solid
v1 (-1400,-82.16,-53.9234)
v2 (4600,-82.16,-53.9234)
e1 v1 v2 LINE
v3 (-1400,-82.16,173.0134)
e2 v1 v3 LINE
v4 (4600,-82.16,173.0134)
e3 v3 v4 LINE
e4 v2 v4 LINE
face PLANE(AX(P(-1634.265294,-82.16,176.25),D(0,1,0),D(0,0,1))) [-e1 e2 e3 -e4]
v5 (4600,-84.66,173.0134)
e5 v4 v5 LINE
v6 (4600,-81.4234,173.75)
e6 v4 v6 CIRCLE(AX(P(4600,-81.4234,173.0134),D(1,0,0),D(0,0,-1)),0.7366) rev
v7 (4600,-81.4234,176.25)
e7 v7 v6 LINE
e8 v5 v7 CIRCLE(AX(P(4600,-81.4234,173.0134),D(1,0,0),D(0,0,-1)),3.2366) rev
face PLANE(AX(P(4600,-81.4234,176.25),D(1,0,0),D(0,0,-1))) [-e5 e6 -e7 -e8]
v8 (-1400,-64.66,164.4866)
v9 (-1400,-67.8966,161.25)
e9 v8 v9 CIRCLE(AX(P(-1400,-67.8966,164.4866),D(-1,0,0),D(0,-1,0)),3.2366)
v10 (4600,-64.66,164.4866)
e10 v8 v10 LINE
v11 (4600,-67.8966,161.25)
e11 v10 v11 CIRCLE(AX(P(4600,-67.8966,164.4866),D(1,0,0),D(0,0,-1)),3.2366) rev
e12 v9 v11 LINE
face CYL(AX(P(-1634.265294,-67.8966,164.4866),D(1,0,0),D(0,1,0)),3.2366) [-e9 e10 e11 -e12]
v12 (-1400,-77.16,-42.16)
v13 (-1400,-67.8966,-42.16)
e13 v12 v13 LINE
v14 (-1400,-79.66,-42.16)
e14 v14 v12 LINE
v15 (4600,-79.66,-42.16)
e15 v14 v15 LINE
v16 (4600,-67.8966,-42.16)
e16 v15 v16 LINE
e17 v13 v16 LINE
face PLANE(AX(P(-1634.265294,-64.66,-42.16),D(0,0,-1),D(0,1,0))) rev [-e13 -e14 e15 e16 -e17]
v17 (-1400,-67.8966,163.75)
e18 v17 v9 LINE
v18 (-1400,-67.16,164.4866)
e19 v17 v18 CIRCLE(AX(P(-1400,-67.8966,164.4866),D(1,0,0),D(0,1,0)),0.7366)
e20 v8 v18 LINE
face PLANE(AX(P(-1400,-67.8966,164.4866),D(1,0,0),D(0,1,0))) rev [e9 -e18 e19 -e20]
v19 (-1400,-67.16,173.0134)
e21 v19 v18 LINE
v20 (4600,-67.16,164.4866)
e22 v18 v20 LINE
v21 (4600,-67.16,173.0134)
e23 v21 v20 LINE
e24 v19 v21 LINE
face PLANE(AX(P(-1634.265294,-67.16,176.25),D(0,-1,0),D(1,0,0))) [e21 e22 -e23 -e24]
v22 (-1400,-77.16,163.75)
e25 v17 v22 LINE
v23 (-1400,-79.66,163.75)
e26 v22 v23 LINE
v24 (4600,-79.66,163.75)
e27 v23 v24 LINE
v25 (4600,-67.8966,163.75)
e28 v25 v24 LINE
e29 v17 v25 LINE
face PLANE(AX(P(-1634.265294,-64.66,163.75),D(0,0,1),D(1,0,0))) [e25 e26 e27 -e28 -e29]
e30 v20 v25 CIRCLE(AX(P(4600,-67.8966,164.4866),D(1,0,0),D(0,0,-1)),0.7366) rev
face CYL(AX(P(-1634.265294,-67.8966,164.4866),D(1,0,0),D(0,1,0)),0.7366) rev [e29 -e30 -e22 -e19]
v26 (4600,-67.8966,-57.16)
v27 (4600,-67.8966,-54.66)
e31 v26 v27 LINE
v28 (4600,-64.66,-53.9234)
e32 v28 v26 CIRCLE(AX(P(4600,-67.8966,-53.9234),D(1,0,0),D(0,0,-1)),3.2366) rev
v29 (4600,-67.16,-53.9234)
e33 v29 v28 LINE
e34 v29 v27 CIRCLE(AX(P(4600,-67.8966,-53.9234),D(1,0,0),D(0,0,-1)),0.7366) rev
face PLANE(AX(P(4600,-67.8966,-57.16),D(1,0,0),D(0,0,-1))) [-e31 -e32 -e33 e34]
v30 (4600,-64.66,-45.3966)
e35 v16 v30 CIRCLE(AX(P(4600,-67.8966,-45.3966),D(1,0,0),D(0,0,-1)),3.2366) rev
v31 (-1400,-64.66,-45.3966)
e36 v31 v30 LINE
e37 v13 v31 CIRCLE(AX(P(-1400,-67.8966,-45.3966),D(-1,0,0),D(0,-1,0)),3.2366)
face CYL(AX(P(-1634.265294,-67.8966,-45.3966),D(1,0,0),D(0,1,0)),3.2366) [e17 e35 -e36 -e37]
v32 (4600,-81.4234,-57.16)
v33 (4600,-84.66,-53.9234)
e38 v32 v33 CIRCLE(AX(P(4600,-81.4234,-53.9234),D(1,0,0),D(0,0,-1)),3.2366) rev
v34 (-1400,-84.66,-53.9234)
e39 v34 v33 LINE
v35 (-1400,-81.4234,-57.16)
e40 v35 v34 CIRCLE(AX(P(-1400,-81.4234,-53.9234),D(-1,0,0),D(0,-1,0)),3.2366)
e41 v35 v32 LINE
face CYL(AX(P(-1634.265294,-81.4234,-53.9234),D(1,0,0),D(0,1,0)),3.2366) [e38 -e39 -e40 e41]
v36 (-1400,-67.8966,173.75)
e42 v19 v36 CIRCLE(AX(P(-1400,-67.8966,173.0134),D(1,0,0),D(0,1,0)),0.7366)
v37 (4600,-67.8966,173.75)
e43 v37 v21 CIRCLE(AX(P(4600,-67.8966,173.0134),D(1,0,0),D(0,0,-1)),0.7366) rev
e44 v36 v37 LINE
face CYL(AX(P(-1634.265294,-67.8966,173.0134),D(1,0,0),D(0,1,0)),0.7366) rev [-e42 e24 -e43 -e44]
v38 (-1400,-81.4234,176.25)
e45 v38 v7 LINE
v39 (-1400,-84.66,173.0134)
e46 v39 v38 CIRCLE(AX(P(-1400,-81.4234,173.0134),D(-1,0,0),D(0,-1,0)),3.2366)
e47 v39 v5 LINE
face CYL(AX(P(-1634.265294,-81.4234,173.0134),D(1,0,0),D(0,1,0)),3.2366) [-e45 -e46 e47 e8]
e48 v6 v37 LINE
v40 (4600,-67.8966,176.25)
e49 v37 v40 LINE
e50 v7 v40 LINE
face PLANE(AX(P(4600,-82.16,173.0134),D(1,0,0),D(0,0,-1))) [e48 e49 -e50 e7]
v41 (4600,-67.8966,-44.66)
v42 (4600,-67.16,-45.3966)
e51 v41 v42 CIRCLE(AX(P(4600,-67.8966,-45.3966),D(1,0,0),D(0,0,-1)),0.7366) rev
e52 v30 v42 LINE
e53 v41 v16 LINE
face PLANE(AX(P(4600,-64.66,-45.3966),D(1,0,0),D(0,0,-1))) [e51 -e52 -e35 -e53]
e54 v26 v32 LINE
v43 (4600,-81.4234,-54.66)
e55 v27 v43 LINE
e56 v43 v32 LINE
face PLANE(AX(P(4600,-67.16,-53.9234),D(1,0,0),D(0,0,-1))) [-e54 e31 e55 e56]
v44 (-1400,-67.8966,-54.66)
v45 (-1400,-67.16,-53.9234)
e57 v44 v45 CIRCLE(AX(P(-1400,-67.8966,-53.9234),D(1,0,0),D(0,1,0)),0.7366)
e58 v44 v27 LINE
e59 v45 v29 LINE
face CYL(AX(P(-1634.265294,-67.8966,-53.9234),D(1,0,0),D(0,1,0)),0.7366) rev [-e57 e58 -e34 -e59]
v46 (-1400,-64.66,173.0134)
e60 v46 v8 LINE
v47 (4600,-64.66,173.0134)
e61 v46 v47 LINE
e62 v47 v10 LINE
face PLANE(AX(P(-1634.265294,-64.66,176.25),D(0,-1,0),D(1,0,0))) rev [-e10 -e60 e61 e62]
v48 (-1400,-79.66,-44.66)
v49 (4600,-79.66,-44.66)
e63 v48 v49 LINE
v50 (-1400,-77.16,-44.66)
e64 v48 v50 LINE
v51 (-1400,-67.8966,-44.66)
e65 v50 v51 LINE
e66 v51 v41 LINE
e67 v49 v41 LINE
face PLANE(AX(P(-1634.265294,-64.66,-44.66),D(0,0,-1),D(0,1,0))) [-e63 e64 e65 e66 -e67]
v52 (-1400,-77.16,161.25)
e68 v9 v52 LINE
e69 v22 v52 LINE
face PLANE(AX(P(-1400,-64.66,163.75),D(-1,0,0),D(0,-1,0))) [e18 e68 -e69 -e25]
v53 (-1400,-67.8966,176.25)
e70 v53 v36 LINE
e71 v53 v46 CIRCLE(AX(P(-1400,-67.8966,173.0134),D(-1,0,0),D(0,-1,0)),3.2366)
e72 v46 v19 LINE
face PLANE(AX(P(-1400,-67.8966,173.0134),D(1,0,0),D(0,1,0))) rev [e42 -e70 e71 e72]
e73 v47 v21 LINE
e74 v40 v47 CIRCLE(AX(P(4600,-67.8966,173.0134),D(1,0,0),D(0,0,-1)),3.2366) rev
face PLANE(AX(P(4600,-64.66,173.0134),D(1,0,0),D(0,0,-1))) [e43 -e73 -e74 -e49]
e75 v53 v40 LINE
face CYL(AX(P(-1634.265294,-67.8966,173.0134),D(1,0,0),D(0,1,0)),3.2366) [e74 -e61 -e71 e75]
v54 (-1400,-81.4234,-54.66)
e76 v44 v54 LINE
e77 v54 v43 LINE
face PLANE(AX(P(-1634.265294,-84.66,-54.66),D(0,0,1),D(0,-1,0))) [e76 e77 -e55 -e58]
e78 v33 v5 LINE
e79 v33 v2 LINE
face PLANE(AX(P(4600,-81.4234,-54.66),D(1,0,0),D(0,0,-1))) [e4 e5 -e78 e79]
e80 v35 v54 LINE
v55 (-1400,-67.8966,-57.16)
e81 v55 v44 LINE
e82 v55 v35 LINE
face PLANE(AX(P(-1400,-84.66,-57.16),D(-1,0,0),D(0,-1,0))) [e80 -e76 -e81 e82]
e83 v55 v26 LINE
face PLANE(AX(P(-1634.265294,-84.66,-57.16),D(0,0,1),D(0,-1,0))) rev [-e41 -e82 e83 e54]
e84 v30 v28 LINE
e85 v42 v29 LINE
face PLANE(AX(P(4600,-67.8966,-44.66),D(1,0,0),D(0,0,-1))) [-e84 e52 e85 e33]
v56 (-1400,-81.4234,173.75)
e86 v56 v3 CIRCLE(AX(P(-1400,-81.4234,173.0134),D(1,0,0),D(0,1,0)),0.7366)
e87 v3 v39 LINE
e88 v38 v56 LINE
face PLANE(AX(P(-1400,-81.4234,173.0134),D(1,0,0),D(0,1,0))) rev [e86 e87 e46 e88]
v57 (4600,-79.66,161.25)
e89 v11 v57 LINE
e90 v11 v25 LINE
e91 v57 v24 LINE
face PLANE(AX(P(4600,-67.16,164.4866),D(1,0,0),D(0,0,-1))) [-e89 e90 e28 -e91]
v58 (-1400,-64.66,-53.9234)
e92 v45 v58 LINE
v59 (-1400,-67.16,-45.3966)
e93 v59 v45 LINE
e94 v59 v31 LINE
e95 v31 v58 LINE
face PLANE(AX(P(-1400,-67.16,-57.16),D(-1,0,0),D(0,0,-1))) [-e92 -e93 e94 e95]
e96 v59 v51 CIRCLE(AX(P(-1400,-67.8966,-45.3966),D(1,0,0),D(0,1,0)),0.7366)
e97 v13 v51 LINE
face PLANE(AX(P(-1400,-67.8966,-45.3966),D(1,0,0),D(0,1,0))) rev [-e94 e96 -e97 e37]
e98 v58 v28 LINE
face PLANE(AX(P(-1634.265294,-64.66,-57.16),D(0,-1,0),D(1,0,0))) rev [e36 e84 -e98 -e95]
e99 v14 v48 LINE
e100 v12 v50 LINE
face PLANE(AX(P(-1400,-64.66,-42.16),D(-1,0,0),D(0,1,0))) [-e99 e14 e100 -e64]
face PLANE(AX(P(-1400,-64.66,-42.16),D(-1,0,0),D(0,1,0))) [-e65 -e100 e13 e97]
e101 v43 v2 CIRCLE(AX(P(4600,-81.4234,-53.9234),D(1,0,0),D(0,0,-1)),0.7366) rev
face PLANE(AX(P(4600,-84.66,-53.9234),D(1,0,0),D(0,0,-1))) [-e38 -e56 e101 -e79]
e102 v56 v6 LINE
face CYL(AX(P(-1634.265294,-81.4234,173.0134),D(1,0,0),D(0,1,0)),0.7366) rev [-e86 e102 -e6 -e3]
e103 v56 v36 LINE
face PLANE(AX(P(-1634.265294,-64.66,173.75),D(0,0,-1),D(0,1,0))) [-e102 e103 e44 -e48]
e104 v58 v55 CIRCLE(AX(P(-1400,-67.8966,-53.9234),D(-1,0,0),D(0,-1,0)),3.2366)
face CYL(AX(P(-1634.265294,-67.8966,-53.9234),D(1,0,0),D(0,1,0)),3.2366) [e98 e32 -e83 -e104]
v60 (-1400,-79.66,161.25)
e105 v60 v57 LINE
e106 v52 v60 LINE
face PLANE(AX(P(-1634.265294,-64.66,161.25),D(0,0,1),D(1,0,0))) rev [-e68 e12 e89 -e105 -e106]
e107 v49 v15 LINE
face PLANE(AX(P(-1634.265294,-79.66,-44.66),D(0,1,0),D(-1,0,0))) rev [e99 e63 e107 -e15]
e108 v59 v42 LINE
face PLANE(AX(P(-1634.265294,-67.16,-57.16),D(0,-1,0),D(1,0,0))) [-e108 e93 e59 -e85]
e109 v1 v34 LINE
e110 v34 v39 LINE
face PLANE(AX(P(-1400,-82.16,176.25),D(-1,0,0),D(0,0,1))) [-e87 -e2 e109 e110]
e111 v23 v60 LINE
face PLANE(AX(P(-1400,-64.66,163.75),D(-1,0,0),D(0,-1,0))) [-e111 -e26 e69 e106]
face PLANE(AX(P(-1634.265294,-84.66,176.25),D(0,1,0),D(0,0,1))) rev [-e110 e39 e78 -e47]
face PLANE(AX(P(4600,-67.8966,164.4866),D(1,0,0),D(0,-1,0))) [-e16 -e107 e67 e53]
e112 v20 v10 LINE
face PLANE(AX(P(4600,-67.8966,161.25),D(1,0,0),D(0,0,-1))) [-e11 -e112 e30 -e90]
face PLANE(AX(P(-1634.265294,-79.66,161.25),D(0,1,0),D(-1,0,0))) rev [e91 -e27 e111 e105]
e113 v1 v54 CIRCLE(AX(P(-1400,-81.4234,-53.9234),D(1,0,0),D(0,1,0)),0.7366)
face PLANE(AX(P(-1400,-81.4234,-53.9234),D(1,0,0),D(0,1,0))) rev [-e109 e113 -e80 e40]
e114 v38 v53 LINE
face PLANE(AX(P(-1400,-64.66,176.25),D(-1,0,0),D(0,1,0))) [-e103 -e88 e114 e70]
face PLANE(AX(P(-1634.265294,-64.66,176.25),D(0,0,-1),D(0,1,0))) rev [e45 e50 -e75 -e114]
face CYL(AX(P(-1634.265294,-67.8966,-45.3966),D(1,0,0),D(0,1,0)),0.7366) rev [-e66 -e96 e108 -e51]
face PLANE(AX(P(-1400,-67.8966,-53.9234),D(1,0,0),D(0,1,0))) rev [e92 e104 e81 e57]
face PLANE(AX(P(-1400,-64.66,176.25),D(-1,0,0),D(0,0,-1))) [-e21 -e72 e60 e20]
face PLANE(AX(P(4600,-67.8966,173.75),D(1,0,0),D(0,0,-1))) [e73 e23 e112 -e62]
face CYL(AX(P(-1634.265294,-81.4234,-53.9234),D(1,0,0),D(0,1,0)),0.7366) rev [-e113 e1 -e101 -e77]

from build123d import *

# Parameters (mm, degrees)
BASE_FLANGE1_DEPTH = 6000


# Sheet-metal steps are written as plain solids
with BuildPart() as part:
    # Sketch2 → Base-Flange1 (new body)
    with BuildSketch(Plane(origin=(4600, 0, 0), x_dir=(0, 0, -1), z_dir=(1, 0, 0))):
        with BuildLine():
            Line((-161.25, -79.66), (-161.25, -67.8966))
            ThreePointArc((-161.25, -67.8966), (-162.197978192, -65.607978192), (-164.4866, -64.66))
            Line((-164.4866, -64.66), (-173.0134, -64.66))
            ThreePointArc((-173.0134, -64.66), (-175.302021808, -65.607978192), (-176.25, -67.8966))
            Line((-176.25, -67.8966), (-176.25, -81.4234))
            ThreePointArc((-176.25, -81.4234), (-175.302021808, -83.712021808), (-173.0134, -84.66))
            Line((-173.0134, -84.66), (53.9234, -84.66))
            ThreePointArc((53.9234, -84.66), (56.212021808, -83.712021808), (57.16, -81.4234))
            Line((57.16, -81.4234), (57.16, -67.8966))
            ThreePointArc((57.16, -67.8966), (56.212021808, -65.607978192), (53.9234, -64.66))
            Line((53.9234, -64.66), (45.3966, -64.66))
            ThreePointArc((45.3966, -64.66), (43.107978192, -65.607978192), (42.16, -67.8966))
            Line((42.16, -67.8966), (42.16, -79.66))
            Line((42.16, -79.66), (44.66, -79.66))
            Line((44.66, -79.66), (44.66, -67.8966))
            ThreePointArc((44.66, -67.8966), (44.875745145, -67.375745145), (45.3966, -67.16))
            Line((45.3966, -67.16), (53.9234, -67.16))
            ThreePointArc((53.9234, -67.16), (54.444254855, -67.375745145), (54.66, -67.8966))
            Line((54.66, -67.8966), (54.66, -81.4234))
            ThreePointArc((54.66, -81.4234), (54.444254855, -81.944254855), (53.9234, -82.16))
            Line((53.9234, -82.16), (-173.0134, -82.16))
            ThreePointArc((-173.0134, -82.16), (-173.534254855, -81.944254855), (-173.75, -81.4234))
            Line((-173.75, -81.4234), (-173.75, -67.8966))
            ThreePointArc((-173.75, -67.8966), (-173.534254855, -67.375745145), (-173.0134, -67.16))
            Line((-173.0134, -67.16), (-164.4866, -67.16))
            ThreePointArc((-164.4866, -67.16), (-163.965745145, -67.375745145), (-163.75, -67.8966))
            Line((-163.75, -67.8966), (-163.75, -79.66))
            Line((-163.75, -79.66), (-161.25, -79.66))
        make_face()
    extrude(amount=-BASE_FLANGE1_DEPTH)


solid = part.part
